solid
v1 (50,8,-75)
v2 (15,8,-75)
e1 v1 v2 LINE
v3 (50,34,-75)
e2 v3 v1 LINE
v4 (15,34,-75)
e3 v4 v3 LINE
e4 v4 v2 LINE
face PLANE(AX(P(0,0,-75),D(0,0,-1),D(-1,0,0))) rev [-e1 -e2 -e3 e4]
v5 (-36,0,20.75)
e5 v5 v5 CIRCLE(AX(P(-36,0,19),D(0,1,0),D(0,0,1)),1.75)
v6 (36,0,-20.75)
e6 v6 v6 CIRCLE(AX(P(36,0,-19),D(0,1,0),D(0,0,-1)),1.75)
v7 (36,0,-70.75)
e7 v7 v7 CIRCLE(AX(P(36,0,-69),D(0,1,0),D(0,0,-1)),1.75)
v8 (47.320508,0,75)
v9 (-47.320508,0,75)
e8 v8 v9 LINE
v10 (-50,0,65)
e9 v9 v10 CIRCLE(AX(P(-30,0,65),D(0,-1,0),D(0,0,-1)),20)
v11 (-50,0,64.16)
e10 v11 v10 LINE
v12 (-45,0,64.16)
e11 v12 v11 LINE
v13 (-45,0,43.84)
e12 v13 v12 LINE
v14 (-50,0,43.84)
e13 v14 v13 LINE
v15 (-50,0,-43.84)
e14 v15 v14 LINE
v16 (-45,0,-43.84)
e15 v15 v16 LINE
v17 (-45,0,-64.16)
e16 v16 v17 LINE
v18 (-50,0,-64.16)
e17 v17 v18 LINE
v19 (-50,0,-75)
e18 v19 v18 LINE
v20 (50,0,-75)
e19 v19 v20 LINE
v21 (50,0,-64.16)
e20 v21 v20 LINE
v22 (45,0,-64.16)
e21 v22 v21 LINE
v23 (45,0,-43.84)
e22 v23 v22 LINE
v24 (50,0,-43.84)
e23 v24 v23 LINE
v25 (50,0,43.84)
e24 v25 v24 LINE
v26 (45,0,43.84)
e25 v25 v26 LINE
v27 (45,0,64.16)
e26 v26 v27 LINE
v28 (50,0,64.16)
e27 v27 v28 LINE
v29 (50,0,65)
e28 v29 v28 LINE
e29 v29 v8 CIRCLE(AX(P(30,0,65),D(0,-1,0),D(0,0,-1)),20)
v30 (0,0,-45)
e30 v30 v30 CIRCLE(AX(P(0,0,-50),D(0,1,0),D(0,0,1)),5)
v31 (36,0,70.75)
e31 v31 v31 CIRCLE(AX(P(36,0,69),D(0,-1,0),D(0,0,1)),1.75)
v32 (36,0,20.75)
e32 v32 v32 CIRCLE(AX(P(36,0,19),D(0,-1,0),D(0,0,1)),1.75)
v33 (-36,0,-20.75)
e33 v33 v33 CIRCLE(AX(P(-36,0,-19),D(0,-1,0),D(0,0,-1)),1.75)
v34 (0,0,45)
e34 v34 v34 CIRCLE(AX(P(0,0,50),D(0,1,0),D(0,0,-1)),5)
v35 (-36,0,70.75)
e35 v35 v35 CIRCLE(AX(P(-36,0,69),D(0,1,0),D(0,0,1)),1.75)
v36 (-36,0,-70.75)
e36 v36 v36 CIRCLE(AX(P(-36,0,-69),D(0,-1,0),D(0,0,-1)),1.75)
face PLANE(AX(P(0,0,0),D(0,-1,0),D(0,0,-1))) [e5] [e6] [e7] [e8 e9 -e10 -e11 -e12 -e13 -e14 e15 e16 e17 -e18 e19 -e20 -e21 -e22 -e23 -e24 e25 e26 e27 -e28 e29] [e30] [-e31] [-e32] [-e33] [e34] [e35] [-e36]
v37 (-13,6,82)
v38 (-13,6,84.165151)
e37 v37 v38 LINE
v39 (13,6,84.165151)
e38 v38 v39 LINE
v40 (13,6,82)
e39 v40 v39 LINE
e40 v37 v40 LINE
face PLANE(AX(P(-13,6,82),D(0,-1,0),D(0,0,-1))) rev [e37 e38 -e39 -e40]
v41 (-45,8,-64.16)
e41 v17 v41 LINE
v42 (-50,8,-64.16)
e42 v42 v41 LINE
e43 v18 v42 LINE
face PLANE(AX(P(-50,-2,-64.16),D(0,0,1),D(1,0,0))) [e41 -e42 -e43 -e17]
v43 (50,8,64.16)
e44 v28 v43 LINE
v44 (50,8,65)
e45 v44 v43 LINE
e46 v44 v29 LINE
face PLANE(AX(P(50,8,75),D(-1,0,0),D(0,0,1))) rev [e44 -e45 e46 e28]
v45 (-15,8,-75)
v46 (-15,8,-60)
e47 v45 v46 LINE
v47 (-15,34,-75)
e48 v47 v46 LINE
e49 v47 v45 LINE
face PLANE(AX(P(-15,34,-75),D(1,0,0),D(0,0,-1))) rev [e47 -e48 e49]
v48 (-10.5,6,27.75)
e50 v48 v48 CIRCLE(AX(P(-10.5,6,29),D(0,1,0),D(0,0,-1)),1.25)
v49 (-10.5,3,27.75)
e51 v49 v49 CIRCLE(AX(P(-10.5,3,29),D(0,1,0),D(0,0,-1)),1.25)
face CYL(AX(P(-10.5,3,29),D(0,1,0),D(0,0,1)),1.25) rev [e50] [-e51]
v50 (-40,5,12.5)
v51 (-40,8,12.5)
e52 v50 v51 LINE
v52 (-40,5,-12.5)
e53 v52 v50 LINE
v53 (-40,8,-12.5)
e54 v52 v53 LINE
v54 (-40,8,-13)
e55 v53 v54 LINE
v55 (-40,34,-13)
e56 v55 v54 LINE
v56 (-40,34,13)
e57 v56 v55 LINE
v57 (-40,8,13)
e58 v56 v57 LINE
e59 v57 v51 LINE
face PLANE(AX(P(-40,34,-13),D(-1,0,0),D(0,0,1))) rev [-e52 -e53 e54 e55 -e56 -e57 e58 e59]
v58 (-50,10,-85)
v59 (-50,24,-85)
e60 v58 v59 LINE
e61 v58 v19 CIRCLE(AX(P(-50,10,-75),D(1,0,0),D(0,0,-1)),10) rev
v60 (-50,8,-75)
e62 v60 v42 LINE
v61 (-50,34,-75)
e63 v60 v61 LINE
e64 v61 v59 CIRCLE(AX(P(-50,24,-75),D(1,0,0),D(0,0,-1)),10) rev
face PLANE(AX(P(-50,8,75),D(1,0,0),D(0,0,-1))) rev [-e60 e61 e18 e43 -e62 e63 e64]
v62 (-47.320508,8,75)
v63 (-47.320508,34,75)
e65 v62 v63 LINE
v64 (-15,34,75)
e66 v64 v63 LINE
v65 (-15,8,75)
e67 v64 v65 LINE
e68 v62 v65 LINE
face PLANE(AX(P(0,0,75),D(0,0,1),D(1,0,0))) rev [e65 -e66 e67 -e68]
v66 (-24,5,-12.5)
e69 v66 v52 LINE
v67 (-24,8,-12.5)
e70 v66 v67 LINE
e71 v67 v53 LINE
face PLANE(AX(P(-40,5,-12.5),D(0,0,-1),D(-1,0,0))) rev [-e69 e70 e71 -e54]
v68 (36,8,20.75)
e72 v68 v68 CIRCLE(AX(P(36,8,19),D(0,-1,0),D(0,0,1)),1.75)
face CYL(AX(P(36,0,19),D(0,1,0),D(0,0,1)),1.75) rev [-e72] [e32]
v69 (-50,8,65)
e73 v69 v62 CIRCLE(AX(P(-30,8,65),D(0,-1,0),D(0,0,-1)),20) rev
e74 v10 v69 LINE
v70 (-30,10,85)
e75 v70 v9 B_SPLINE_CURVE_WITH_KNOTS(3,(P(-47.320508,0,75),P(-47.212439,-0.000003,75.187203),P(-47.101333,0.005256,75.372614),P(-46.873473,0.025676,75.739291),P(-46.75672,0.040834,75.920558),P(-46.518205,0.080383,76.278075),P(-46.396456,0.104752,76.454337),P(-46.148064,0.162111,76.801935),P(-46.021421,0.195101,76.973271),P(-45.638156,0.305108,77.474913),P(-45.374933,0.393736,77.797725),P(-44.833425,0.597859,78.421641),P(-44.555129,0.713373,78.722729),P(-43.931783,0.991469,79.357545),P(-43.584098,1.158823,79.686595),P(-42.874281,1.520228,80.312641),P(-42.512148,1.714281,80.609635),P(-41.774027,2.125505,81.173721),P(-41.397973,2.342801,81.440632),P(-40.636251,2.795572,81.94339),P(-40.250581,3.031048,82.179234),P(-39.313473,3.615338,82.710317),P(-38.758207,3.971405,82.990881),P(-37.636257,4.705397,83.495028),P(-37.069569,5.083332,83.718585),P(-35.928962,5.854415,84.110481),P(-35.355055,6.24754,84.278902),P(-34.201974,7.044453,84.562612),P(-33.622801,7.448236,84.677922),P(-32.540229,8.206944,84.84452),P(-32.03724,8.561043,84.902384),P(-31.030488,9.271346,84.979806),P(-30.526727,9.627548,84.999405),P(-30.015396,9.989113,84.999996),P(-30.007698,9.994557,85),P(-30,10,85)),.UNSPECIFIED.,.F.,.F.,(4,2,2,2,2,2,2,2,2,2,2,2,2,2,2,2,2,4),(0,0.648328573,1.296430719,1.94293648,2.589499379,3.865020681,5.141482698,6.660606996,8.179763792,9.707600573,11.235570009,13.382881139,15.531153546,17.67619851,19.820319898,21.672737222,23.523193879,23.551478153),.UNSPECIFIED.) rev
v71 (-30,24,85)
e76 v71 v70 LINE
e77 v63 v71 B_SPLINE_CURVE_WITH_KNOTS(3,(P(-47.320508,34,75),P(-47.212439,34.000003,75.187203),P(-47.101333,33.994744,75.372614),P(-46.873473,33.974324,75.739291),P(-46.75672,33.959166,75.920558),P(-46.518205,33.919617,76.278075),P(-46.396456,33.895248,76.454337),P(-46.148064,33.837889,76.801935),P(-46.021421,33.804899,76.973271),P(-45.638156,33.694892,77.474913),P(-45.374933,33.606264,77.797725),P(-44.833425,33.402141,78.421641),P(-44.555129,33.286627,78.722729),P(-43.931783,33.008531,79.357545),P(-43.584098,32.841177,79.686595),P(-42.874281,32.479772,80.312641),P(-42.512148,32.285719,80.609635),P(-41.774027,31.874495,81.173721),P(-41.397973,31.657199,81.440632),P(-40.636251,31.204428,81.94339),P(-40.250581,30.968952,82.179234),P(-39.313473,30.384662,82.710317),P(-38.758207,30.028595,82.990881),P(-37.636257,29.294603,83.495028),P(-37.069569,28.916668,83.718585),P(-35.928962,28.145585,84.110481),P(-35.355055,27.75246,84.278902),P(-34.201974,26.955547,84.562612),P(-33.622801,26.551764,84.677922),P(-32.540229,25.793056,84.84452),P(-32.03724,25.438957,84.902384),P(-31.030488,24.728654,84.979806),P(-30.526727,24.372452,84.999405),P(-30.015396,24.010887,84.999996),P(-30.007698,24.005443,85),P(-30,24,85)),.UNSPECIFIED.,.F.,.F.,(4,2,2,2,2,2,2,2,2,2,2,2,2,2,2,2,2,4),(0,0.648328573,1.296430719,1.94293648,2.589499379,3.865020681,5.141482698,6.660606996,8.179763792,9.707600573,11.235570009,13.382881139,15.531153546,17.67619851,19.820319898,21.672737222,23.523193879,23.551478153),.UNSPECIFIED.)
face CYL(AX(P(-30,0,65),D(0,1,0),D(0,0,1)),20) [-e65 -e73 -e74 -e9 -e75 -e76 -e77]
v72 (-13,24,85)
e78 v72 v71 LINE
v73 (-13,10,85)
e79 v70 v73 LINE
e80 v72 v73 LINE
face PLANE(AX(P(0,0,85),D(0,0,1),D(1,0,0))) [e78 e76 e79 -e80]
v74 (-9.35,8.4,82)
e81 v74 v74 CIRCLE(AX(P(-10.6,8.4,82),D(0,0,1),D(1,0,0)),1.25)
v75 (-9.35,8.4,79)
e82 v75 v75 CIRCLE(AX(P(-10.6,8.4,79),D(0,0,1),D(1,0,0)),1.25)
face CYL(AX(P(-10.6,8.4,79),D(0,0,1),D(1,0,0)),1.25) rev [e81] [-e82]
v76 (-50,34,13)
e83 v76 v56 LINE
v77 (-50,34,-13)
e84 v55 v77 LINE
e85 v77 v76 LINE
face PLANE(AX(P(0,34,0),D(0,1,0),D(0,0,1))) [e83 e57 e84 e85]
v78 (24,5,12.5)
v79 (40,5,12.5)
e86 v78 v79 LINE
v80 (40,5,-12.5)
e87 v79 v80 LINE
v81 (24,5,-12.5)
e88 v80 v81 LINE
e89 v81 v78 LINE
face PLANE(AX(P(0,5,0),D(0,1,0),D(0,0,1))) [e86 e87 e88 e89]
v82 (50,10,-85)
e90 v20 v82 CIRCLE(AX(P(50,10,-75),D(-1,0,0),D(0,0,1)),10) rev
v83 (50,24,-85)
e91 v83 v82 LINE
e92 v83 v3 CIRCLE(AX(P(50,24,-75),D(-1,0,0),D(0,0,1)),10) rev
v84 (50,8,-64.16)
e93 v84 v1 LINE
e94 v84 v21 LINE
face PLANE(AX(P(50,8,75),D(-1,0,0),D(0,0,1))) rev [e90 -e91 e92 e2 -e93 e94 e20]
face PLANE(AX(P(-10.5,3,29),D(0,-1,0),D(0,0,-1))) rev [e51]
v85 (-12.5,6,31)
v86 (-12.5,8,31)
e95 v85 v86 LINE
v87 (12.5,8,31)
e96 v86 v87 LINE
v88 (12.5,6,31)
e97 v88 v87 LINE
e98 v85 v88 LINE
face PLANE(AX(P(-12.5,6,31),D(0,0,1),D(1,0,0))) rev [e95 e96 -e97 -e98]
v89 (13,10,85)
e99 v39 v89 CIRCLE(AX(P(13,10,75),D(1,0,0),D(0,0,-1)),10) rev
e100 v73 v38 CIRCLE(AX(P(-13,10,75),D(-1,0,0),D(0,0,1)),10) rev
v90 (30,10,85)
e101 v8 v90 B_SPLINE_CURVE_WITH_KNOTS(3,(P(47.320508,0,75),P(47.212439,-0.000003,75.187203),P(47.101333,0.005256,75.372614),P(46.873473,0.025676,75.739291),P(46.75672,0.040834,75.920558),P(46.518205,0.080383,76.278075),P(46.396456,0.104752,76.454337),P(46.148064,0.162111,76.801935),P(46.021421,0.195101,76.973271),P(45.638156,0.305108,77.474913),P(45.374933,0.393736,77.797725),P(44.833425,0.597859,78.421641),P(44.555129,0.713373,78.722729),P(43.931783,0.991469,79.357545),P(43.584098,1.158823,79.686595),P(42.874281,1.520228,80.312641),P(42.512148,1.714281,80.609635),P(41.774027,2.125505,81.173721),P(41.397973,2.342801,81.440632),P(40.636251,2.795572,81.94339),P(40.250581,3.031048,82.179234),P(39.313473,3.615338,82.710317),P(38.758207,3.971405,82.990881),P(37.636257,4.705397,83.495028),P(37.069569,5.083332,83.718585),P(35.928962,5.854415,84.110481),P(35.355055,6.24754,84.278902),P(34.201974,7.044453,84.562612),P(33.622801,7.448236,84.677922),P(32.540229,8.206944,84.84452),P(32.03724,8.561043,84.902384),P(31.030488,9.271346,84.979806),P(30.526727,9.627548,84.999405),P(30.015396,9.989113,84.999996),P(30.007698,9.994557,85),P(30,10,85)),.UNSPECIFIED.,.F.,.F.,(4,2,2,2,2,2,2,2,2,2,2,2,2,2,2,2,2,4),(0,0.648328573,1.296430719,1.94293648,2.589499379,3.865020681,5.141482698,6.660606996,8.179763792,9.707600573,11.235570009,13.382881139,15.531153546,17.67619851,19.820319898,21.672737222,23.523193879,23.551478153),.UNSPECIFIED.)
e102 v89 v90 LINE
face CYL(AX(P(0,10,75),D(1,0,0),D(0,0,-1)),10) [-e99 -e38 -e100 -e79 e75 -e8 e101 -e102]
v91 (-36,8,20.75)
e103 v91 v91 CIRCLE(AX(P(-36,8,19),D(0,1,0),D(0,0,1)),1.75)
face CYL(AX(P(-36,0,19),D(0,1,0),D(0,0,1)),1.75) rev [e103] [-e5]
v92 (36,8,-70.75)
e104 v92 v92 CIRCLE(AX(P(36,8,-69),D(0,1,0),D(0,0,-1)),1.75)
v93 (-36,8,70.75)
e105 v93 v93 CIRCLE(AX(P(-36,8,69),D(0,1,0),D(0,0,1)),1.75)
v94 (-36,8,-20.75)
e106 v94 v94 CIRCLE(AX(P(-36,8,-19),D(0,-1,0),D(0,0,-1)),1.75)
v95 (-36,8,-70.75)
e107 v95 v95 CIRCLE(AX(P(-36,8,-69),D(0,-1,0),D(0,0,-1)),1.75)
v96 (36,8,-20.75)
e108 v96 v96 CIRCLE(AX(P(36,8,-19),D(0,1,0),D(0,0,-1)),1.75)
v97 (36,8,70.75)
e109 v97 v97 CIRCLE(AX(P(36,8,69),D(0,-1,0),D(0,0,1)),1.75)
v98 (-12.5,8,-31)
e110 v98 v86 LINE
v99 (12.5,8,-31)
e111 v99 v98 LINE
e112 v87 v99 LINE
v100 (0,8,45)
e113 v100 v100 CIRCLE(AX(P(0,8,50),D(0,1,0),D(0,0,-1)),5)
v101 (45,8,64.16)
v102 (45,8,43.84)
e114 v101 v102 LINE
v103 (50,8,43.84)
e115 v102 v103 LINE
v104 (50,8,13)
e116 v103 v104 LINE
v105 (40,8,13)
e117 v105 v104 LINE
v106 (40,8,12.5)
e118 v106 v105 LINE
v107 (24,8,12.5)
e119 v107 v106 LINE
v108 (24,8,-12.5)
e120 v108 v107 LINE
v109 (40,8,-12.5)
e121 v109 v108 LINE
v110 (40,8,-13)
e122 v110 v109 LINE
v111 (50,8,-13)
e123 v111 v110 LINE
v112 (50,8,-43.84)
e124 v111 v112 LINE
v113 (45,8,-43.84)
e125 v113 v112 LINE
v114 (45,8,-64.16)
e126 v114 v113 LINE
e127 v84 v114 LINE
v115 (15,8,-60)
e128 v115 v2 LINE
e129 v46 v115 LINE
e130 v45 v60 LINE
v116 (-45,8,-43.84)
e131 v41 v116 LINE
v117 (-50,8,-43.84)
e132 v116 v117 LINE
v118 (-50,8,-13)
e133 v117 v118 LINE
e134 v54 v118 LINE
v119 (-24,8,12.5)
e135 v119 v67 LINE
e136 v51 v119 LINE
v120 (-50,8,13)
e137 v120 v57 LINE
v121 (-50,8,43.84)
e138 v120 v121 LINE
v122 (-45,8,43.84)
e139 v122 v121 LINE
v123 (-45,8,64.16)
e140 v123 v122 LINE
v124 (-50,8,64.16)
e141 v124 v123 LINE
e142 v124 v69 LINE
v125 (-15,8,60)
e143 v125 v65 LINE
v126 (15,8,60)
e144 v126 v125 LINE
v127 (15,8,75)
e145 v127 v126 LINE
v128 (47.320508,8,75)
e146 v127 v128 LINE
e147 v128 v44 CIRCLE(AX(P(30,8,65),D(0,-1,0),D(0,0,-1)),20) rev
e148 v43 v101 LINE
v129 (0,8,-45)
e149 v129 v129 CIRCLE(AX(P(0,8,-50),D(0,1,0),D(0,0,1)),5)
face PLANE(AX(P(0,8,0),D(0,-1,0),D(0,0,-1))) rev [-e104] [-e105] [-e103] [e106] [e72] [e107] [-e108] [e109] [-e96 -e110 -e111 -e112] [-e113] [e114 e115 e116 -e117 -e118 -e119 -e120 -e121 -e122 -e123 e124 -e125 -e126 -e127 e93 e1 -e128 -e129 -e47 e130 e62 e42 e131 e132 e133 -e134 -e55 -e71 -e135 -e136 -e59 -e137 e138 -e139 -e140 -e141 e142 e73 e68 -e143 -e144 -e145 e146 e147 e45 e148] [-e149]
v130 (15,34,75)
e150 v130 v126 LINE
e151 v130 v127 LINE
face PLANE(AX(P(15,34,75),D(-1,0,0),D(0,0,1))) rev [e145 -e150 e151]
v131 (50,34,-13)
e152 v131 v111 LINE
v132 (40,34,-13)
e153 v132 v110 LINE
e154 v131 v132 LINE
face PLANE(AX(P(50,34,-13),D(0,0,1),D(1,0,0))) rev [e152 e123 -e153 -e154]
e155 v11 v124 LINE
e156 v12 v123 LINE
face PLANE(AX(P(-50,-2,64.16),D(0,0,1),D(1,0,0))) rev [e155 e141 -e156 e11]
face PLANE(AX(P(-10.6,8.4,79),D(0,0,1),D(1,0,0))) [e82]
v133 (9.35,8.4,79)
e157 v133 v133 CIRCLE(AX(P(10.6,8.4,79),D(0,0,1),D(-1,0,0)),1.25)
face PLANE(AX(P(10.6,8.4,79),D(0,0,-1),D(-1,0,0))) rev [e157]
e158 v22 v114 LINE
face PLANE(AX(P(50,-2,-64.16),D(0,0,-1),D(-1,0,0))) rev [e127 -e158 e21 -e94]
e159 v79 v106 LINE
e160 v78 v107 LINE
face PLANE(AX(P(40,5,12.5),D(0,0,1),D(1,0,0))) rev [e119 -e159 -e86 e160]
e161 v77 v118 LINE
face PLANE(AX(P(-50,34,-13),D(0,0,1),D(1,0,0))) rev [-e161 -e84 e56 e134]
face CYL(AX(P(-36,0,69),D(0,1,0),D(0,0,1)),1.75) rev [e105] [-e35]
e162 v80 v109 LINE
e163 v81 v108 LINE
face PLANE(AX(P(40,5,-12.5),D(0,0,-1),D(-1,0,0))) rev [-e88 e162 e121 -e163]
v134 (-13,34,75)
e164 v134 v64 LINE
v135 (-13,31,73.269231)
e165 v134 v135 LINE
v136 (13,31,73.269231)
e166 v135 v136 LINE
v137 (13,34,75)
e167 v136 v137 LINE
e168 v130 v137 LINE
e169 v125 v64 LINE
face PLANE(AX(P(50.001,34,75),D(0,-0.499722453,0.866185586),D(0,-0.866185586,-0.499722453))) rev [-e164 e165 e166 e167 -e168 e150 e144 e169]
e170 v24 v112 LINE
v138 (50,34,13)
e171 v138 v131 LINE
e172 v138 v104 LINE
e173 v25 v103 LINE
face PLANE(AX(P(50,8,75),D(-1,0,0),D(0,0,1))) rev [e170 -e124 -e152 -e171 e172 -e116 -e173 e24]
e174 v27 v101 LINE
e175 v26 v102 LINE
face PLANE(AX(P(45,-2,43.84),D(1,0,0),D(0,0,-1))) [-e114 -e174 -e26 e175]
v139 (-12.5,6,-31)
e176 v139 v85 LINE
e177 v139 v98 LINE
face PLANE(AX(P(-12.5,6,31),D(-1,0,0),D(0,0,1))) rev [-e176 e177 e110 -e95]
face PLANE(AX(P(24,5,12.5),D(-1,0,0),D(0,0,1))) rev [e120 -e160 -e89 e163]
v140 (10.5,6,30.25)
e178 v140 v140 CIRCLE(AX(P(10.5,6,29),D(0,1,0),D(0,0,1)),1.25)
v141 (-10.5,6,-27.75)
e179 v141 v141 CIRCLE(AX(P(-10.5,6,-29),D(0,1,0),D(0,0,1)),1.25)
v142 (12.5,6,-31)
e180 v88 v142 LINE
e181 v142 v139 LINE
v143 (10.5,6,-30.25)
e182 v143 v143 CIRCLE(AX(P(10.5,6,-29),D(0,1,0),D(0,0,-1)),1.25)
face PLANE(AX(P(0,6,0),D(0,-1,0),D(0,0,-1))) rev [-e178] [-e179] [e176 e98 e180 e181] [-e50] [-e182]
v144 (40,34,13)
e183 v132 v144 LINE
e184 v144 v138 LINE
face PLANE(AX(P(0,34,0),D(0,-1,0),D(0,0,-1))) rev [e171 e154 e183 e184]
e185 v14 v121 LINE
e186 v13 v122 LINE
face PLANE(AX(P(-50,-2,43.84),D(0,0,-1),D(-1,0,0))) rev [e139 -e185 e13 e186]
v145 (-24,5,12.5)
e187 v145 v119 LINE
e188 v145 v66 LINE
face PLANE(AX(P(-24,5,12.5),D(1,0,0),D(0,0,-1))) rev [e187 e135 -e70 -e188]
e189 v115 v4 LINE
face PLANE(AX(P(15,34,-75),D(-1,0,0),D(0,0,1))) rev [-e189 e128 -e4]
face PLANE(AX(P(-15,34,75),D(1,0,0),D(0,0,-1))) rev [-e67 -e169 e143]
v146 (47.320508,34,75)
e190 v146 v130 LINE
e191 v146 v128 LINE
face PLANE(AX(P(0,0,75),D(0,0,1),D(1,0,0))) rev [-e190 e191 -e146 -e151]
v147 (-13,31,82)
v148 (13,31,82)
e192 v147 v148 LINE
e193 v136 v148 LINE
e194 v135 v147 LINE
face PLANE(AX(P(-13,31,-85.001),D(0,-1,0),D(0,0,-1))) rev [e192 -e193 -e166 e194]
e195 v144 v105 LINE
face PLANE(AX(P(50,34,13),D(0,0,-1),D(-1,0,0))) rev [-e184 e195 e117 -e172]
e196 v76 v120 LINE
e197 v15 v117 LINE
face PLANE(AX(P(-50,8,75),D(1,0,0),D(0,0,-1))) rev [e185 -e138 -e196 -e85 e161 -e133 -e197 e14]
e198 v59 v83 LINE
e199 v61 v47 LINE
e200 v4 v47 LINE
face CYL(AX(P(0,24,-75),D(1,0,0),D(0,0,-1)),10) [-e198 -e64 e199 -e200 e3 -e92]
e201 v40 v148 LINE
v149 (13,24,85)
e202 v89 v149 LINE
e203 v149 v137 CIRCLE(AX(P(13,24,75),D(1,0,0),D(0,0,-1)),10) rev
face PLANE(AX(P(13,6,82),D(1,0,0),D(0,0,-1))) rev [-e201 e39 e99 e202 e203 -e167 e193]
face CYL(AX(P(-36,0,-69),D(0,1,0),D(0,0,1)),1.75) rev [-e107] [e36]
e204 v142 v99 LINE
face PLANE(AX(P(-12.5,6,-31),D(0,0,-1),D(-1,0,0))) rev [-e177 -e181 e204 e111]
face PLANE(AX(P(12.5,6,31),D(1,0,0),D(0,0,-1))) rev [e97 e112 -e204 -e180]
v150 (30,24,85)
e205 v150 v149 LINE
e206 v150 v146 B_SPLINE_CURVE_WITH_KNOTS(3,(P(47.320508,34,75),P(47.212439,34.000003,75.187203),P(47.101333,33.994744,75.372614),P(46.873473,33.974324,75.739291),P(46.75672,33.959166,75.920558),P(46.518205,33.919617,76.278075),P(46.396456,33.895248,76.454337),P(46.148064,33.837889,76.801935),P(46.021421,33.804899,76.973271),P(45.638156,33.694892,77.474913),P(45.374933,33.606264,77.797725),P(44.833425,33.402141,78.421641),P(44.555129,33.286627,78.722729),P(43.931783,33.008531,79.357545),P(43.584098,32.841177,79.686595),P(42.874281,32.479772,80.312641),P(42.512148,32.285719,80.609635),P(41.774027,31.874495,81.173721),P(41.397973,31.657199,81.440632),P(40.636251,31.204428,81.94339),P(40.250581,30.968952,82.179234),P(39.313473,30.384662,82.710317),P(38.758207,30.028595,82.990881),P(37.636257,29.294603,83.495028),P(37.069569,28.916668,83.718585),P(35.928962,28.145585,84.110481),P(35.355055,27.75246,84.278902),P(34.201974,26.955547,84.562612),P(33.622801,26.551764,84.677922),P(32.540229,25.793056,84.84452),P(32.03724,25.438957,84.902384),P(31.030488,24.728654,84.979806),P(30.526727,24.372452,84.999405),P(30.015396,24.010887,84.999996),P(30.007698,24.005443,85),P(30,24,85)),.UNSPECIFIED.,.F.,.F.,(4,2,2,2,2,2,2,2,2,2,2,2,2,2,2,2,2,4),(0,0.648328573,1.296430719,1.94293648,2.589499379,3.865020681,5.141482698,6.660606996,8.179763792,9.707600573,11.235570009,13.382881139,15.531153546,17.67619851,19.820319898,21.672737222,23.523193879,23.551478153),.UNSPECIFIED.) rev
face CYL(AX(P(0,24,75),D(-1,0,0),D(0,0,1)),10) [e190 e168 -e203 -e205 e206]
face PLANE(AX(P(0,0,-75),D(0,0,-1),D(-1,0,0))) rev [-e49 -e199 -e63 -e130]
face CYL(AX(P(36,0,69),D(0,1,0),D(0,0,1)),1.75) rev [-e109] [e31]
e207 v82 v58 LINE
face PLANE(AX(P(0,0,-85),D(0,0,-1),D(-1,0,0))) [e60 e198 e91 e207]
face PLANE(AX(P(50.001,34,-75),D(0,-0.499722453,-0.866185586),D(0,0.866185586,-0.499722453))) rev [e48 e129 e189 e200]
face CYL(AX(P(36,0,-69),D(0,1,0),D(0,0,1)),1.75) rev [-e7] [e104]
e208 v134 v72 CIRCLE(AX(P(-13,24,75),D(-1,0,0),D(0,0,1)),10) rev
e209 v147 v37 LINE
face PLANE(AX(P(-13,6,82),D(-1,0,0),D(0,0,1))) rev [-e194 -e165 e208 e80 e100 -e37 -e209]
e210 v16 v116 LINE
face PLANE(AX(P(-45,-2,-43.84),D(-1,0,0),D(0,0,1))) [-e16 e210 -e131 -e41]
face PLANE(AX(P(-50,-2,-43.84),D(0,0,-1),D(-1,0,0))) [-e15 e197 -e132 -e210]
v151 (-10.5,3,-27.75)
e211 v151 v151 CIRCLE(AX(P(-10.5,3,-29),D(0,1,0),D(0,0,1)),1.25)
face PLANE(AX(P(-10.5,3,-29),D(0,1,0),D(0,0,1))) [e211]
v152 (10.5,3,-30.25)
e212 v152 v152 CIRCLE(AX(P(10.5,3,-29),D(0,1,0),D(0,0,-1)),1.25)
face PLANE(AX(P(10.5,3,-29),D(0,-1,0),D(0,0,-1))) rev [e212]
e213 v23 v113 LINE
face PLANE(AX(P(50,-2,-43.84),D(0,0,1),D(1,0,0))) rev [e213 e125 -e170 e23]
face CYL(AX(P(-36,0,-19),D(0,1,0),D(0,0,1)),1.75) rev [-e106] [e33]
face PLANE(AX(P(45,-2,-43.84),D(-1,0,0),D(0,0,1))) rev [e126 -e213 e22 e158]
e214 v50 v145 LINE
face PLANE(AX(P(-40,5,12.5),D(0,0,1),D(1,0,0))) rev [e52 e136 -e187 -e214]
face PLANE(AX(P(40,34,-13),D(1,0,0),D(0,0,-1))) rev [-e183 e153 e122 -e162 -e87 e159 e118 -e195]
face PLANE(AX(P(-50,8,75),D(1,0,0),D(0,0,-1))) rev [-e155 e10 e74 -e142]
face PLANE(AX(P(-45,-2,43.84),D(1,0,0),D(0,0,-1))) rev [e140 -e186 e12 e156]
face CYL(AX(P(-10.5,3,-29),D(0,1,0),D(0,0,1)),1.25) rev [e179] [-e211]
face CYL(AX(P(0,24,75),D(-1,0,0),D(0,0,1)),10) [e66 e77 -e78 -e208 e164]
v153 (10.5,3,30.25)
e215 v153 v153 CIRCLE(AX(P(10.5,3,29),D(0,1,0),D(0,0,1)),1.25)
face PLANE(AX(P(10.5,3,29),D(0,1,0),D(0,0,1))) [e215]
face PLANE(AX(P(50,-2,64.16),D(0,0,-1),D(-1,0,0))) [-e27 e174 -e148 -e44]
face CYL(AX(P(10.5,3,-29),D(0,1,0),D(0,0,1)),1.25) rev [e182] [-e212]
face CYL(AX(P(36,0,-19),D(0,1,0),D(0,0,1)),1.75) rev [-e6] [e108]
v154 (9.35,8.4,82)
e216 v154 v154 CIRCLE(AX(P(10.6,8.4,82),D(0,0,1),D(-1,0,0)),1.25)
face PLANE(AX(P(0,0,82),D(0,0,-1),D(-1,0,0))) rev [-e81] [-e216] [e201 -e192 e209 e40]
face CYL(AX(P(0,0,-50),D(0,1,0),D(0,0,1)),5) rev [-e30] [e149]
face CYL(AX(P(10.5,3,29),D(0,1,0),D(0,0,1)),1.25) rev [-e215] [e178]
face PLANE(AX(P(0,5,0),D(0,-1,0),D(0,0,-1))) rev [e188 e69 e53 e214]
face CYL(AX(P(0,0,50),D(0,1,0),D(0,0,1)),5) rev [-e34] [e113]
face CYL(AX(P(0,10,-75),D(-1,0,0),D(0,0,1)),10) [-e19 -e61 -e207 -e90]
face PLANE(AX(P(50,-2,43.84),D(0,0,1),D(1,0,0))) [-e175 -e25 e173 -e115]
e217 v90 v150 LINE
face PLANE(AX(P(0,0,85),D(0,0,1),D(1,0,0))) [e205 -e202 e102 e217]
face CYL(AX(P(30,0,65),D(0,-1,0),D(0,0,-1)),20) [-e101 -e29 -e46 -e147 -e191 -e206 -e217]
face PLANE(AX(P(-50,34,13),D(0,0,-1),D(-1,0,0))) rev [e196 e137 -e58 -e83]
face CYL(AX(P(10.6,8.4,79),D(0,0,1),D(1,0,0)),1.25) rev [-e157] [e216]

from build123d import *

# Parameters (mm, degrees)
SKETCH_1_W               = 100
SKETCH_1_H               = 150
EXTRUDE_2_DEPTH          = 8
SKETCH_3_R               = 1.75
CUT_EXTRUDE_1_DEPTH      = 91.493093659
MIRROR_2_COPY_1_SKETCH_R = 1.75
MIRROR_2_COPY_1_DEPTH    = 91.493093659
SKETCH_4_W               = 25
SKETCH_4_H               = 62
CUT_EXTRUDE_2_DEPTH      = 2
SKETCH_6_R               = 1.25
CUT_EXTRUDE_3_DEPTH      = 3
SKETCH_7_W               = 10
SKETCH_7_H               = 26
EXTRUDE_3_DEPTH          = 26
SKETCH_8_W               = 30
SKETCH_8_H               = 15
EXTRUDE_4_DEPTH          = 26
SKETCH_9_W               = 16
SKETCH_9_H               = 25
CUT_EXTRUDE_4_DEPTH      = 3
SKETCH_11_W              = 100
SKETCH_11_H              = 34
EXTRUDE_5_DEPTH          = 10
SKETCH_12_W              = 100
SKETCH_12_H              = 34
EXTRUDE_6_DEPTH          = 10
SKETCH_13_W              = 26
SKETCH_13_H              = 28
CUT_EXTRUDE_5_DEPTH      = 3
CUT_EXTRUDE_6_REACH      = 179.609
SKETCH_14_W              = 26
SKETCH_14_H              = 6
CUT_EXTRUDE_7_REACH      = 114.276
CUT_EXTRUDE_8_REACH      = 114.276
SKETCH_19_R              = 1.25
CUT_EXTRUDE_9_DEPTH      = 3
SKETCH_20_W              = 5
SKETCH_20_H              = 20.32
CUT_EXTRUDE_10_DEPTH     = 10
MIRROR_4_COPY_1_SKETCH_W = 5
MIRROR_4_COPY_1_SKETCH_H = 20.32
MIRROR_4_COPY_1_DEPTH    = 10
FILLET_1_R               = 10
FILLET_2_R               = 10
FILLET_3_R               = 20
FILLET_START             = -1
FILLET_4_DEPTH           = 36
FILLET_5_R               = 10
SKETCH_21_R              = 5
CUT_EXTRUDE_11_DEPTH     = 102.985293215


with BuildPart() as part:
    # 草图1 → 凸台-拉伸2 (new body)
    with BuildSketch(Plane(origin=(0, 0, 0), x_dir=(1, 0, 0), z_dir=(0, 1, 0))):
        Rectangle(SKETCH_1_W, SKETCH_1_H)
    extrude(amount=EXTRUDE_2_DEPTH)

    # 草图3 → 切除-拉伸1 (cut, through all)
    with BuildSketch(Plane(origin=(0, 8, 0), x_dir=(1, 0, 0), z_dir=(0, 1, 0))):
        with Locations(Location((-36, -19, 0), (0, 0, 270))):
            Circle(SKETCH_3_R)
        with Locations(Location((-36, -69, 0), (0, 0, 270))):
            Circle(SKETCH_3_R)
    cut_extrude_1 = extrude(amount=-CUT_EXTRUDE_1_DEPTH, mode=Mode.SUBTRACT)

    # 镜向1: 切除-拉伸1 across plane
    add(cut_extrude_1.mirror(Plane(origin=(0, 0, 0), x_dir=(0, 0, 1), z_dir=(1, 0, 0))), mode=Mode.SUBTRACT)

    # 镜向2: 切除-拉伸1 across plane
    add(cut_extrude_1.mirror(Plane.XY), mode=Mode.SUBTRACT)

    # 镜向2 copy 1 sketch → 镜向2 copy 1 (cut, through all)
    with BuildSketch(Plane(origin=(0, 8, 0), x_dir=(-1, 0, 0), z_dir=(0, 1, 0))):
        with Locations(Location((-36, -19, 0), (0, 0, 270))):
            Circle(MIRROR_2_COPY_1_SKETCH_R)
        with Locations(Location((-36, -69, 0), (0, 0, 270))):
            Circle(MIRROR_2_COPY_1_SKETCH_R)
    extrude(amount=-MIRROR_2_COPY_1_DEPTH, mode=Mode.SUBTRACT)

    # 草图4 → 切除-拉伸2 (cut)
    with BuildSketch(Plane(origin=(0, 8, 0), x_dir=(1, 0, 0), z_dir=(0, 1, 0))):
        Rectangle(SKETCH_4_W, SKETCH_4_H)
    extrude(amount=-CUT_EXTRUDE_2_DEPTH, mode=Mode.SUBTRACT)

    # 草图6 → 切除-拉伸3 (cut)
    with BuildSketch(Plane(origin=(0, 6, 0), x_dir=(1, 0, 0), z_dir=(0, 1, 0))):
        with Locations(Location((-10.5, 29, 0), (0, 0, 270))):
            Circle(SKETCH_6_R)
        with Locations(Location((10.5, 29, 0), (0, 0, 90))):
            Circle(SKETCH_6_R)
        with Locations(Location((10.5, -29, 0), (0, 0, 270))):
            Circle(SKETCH_6_R)
        with Locations(Location((-10.5, -29, 0), (0, 0, 90))):
            Circle(SKETCH_6_R)
    extrude(amount=-CUT_EXTRUDE_3_DEPTH, mode=Mode.SUBTRACT)

    # 草图7 → 凸台-拉伸3 (add)
    with BuildSketch(Plane(origin=(0, 8, 0), x_dir=(1, 0, 0), z_dir=(0, 1, 0))):
        with Locations((-45, 0)):
            Rectangle(SKETCH_7_W, SKETCH_7_H)
        with Locations((45, 0)):
            Rectangle(SKETCH_7_W, SKETCH_7_H)
    extrude(amount=EXTRUDE_3_DEPTH)

    # 草图8 → 凸台-拉伸4 (add)
    with BuildSketch(Plane(origin=(0, 8, 0), x_dir=(1, 0, 0), z_dir=(0, 1, 0))):
        with Locations((0, 67.5)):
            Rectangle(SKETCH_8_W, SKETCH_8_H)
        with Locations((0, -67.5)):
            Rectangle(SKETCH_8_W, SKETCH_8_H)
    extrude(amount=EXTRUDE_4_DEPTH)

    # 草图9 → 切除-拉伸4 (cut)
    with BuildSketch(Plane(origin=(0, 8, 0), x_dir=(1, 0, 0), z_dir=(0, 1, 0))):
        with Locations((-32, 0)):
            Rectangle(SKETCH_9_W, SKETCH_9_H)
        with Locations((32, 0)):
            Rectangle(SKETCH_9_W, SKETCH_9_H)
    extrude(amount=-CUT_EXTRUDE_4_DEPTH, mode=Mode.SUBTRACT)

    # 草图11 → 凸台-拉伸5 (add)
    with BuildSketch(Plane(origin=(0, 0, -75), x_dir=(-1, 0, 0), z_dir=(0, 0, -1))):
        with Locations((0, 17)):
            Rectangle(SKETCH_11_W, SKETCH_11_H)
    extrude(amount=EXTRUDE_5_DEPTH)

    # 草图12 → 凸台-拉伸6 (add)
    with BuildSketch(Plane.XY.offset(75)):
        with Locations((0, 17)):
            Rectangle(SKETCH_12_W, SKETCH_12_H)
    extrude(amount=EXTRUDE_6_DEPTH)

    # 草图13 → 切除-拉伸5 (cut)
    with BuildSketch(Plane.XY.offset(85)):
        with Locations((0, 20)):
            Rectangle(SKETCH_13_W, SKETCH_13_H)
    extrude(amount=-CUT_EXTRUDE_5_DEPTH, mode=Mode.SUBTRACT)

    # 草图14 → 切除-拉伸6 (cut, up to next)
    with BuildSketch(Plane.XY.offset(82), mode=Mode.PRIVATE) as cut_extrude_6_sk1:
        with Locations((0, 34)):
            Rectangle(SKETCH_14_W, SKETCH_14_H)
    cut_extrude_6_tool1 = extrude(cut_extrude_6_sk1.sketch, amount=-CUT_EXTRUDE_6_REACH, mode=Mode.PRIVATE) & part.part
    add(cut_extrude_6_tool1.solids().sort_by_distance((0, 34, 82))[0], mode=Mode.SUBTRACT)

    # 草图17 → 切除-拉伸7 (cut, up to next)
    with BuildSketch(Plane.ZY.offset(15), mode=Mode.PRIVATE) as cut_extrude_7_sk1:
        Polygon((75, 34), (60, 8), (60, 34), align=None)
    cut_extrude_7_tool1 = extrude(cut_extrude_7_sk1.sketch, amount=-CUT_EXTRUDE_7_REACH, mode=Mode.PRIVATE) & part.part
    add(cut_extrude_7_tool1.solids().sort_by_distance((-15, 25.333333, 65))[0], mode=Mode.SUBTRACT)

    # 草图18 → 切除-拉伸8 (cut, up to next)
    with BuildSketch(Plane.ZY.offset(15), mode=Mode.PRIVATE) as cut_extrude_8_sk1:
        Polygon((-75, 34), (-60, 8), (-60, 34), align=None)
    cut_extrude_8_tool1 = extrude(cut_extrude_8_sk1.sketch, amount=-CUT_EXTRUDE_8_REACH, mode=Mode.PRIVATE) & part.part
    add(cut_extrude_8_tool1.solids().sort_by_distance((-15, 25.333333, -65))[0], mode=Mode.SUBTRACT)

    # 草图19 → 切除-拉伸9 (cut)
    with BuildSketch(Plane.XY.offset(82)):
        with Locations((-10.6, 8.4)):
            Circle(SKETCH_19_R)
        with Locations(Location((10.6, 8.4, 0), (0, 0, 180))):
            Circle(SKETCH_19_R)
    extrude(amount=-CUT_EXTRUDE_9_DEPTH, mode=Mode.SUBTRACT)

    # 草图20 → 切除-拉伸10 (cut)
    with BuildSketch(Plane(origin=(0, 8, 0), x_dir=(1, 0, 0), z_dir=(0, 1, 0))):
        with Locations((-47.5, -54)):
            Rectangle(SKETCH_20_W, SKETCH_20_H)
    cut_extrude_10 = extrude(amount=-CUT_EXTRUDE_10_DEPTH, mode=Mode.SUBTRACT)

    # 镜向3: 切除-拉伸10 across plane
    add(cut_extrude_10.mirror(Plane.XY), mode=Mode.SUBTRACT)

    # 镜向4: 切除-拉伸10 across plane
    add(cut_extrude_10.mirror(Plane(origin=(0, 0, 0), x_dir=(0, 0, 1), z_dir=(1, 0, 0))), mode=Mode.SUBTRACT)

    # 镜向4 copy 1 sketch → 镜向4 copy 1 (cut)
    with BuildSketch(Plane(origin=(0, 8, 0), x_dir=(-1, 0, 0), z_dir=(0, 1, 0))):
        with Locations((-47.5, -54)):
            Rectangle(MIRROR_4_COPY_1_SKETCH_W, MIRROR_4_COPY_1_SKETCH_H)
    extrude(amount=-MIRROR_4_COPY_1_DEPTH, mode=Mode.SUBTRACT)

    # 圆角1
    # the kernel refuses this fillet: 10 mm, written as the material it takes off along each edge
    with BuildSketch(Plane(origin=(75, 0, 85), x_dir=(0, 0, -1), z_dir=(-1, 0, 0))) as fillet_1_piece_1:
        with BuildLine():
            CenterArc((FILLET_1_R, -FILLET_1_R), FILLET_1_R, 90, 90)
            Line((0, -FILLET_1_R), (0, 0))
            Line((0, 0), (FILLET_1_R, 0))
        make_face()
    extrude(amount=150, mode=Mode.SUBTRACT)

    # 圆角2
    fillet_2_edges = [part.edges().sort_by_distance(p)[0] for p in [
        (31.5, 34, 85),
        (-31.5, 34, 85),
    ]]
    fillet(fillet_2_edges, radius=FILLET_2_R - 0.0001)  # a hair under: the kernel refuses the full size

    # 圆角3
    # the kernel refuses this fillet: 20 mm, written as the material it takes off along each edge
    with BuildSketch(Plane(origin=(50, 74.0001, 85), x_dir=(0, 0, -1), z_dir=(0, -1, 0))) as fillet_3_piece_1:
        with BuildLine():
            CenterArc((FILLET_3_R, -FILLET_3_R), FILLET_3_R, 90, 90)
            Line((0, -FILLET_3_R), (0, 0))
            Line((0, 0), (FILLET_3_R, 0))
        make_face()
    extrude(amount=114.0001, mode=Mode.SUBTRACT)

    # 圆角4: read off the stored shape, not the designer's step
    # 圆角4 outline → 圆角4 (cut)
    with BuildSketch(Plane(origin=(0, 0, 0), x_dir=(1, 0, 0), z_dir=(0, 1, 0)).offset(FILLET_START)):
        with BuildLine():
            ThreePointArc((-30, -85), (-44.142135624, -79.142135624), (-50, -65))
            Line((-50, -65), (-50, -85))
            Line((-50, -85), (-30, -85))
        make_face()
    extrude(amount=FILLET_4_DEPTH, mode=Mode.SUBTRACT)

    # 圆角5
    fillet_5_edges = [part.edges().sort_by_distance(p)[0] for p in [
        (0, 0, -85),
        (0, 34, -85),
    ]]
    fillet(fillet_5_edges, radius=FILLET_5_R - 0.0001)  # a hair under: the kernel refuses the full size

    # 草图21 → 切除-拉伸11 (cut, through all)
    with BuildSketch(Plane(origin=(0, 8, 0), x_dir=(1, 0, 0), z_dir=(0, 1, 0))):
        with Locations(Location((0, 50, 0), (0, 0, 270))):
            Circle(SKETCH_21_R)
        with Locations(Location((0, -50, 0), (0, 0, 90))):
            Circle(SKETCH_21_R)
    extrude(amount=-CUT_EXTRUDE_11_DEPTH, mode=Mode.SUBTRACT)


solid = part.part
